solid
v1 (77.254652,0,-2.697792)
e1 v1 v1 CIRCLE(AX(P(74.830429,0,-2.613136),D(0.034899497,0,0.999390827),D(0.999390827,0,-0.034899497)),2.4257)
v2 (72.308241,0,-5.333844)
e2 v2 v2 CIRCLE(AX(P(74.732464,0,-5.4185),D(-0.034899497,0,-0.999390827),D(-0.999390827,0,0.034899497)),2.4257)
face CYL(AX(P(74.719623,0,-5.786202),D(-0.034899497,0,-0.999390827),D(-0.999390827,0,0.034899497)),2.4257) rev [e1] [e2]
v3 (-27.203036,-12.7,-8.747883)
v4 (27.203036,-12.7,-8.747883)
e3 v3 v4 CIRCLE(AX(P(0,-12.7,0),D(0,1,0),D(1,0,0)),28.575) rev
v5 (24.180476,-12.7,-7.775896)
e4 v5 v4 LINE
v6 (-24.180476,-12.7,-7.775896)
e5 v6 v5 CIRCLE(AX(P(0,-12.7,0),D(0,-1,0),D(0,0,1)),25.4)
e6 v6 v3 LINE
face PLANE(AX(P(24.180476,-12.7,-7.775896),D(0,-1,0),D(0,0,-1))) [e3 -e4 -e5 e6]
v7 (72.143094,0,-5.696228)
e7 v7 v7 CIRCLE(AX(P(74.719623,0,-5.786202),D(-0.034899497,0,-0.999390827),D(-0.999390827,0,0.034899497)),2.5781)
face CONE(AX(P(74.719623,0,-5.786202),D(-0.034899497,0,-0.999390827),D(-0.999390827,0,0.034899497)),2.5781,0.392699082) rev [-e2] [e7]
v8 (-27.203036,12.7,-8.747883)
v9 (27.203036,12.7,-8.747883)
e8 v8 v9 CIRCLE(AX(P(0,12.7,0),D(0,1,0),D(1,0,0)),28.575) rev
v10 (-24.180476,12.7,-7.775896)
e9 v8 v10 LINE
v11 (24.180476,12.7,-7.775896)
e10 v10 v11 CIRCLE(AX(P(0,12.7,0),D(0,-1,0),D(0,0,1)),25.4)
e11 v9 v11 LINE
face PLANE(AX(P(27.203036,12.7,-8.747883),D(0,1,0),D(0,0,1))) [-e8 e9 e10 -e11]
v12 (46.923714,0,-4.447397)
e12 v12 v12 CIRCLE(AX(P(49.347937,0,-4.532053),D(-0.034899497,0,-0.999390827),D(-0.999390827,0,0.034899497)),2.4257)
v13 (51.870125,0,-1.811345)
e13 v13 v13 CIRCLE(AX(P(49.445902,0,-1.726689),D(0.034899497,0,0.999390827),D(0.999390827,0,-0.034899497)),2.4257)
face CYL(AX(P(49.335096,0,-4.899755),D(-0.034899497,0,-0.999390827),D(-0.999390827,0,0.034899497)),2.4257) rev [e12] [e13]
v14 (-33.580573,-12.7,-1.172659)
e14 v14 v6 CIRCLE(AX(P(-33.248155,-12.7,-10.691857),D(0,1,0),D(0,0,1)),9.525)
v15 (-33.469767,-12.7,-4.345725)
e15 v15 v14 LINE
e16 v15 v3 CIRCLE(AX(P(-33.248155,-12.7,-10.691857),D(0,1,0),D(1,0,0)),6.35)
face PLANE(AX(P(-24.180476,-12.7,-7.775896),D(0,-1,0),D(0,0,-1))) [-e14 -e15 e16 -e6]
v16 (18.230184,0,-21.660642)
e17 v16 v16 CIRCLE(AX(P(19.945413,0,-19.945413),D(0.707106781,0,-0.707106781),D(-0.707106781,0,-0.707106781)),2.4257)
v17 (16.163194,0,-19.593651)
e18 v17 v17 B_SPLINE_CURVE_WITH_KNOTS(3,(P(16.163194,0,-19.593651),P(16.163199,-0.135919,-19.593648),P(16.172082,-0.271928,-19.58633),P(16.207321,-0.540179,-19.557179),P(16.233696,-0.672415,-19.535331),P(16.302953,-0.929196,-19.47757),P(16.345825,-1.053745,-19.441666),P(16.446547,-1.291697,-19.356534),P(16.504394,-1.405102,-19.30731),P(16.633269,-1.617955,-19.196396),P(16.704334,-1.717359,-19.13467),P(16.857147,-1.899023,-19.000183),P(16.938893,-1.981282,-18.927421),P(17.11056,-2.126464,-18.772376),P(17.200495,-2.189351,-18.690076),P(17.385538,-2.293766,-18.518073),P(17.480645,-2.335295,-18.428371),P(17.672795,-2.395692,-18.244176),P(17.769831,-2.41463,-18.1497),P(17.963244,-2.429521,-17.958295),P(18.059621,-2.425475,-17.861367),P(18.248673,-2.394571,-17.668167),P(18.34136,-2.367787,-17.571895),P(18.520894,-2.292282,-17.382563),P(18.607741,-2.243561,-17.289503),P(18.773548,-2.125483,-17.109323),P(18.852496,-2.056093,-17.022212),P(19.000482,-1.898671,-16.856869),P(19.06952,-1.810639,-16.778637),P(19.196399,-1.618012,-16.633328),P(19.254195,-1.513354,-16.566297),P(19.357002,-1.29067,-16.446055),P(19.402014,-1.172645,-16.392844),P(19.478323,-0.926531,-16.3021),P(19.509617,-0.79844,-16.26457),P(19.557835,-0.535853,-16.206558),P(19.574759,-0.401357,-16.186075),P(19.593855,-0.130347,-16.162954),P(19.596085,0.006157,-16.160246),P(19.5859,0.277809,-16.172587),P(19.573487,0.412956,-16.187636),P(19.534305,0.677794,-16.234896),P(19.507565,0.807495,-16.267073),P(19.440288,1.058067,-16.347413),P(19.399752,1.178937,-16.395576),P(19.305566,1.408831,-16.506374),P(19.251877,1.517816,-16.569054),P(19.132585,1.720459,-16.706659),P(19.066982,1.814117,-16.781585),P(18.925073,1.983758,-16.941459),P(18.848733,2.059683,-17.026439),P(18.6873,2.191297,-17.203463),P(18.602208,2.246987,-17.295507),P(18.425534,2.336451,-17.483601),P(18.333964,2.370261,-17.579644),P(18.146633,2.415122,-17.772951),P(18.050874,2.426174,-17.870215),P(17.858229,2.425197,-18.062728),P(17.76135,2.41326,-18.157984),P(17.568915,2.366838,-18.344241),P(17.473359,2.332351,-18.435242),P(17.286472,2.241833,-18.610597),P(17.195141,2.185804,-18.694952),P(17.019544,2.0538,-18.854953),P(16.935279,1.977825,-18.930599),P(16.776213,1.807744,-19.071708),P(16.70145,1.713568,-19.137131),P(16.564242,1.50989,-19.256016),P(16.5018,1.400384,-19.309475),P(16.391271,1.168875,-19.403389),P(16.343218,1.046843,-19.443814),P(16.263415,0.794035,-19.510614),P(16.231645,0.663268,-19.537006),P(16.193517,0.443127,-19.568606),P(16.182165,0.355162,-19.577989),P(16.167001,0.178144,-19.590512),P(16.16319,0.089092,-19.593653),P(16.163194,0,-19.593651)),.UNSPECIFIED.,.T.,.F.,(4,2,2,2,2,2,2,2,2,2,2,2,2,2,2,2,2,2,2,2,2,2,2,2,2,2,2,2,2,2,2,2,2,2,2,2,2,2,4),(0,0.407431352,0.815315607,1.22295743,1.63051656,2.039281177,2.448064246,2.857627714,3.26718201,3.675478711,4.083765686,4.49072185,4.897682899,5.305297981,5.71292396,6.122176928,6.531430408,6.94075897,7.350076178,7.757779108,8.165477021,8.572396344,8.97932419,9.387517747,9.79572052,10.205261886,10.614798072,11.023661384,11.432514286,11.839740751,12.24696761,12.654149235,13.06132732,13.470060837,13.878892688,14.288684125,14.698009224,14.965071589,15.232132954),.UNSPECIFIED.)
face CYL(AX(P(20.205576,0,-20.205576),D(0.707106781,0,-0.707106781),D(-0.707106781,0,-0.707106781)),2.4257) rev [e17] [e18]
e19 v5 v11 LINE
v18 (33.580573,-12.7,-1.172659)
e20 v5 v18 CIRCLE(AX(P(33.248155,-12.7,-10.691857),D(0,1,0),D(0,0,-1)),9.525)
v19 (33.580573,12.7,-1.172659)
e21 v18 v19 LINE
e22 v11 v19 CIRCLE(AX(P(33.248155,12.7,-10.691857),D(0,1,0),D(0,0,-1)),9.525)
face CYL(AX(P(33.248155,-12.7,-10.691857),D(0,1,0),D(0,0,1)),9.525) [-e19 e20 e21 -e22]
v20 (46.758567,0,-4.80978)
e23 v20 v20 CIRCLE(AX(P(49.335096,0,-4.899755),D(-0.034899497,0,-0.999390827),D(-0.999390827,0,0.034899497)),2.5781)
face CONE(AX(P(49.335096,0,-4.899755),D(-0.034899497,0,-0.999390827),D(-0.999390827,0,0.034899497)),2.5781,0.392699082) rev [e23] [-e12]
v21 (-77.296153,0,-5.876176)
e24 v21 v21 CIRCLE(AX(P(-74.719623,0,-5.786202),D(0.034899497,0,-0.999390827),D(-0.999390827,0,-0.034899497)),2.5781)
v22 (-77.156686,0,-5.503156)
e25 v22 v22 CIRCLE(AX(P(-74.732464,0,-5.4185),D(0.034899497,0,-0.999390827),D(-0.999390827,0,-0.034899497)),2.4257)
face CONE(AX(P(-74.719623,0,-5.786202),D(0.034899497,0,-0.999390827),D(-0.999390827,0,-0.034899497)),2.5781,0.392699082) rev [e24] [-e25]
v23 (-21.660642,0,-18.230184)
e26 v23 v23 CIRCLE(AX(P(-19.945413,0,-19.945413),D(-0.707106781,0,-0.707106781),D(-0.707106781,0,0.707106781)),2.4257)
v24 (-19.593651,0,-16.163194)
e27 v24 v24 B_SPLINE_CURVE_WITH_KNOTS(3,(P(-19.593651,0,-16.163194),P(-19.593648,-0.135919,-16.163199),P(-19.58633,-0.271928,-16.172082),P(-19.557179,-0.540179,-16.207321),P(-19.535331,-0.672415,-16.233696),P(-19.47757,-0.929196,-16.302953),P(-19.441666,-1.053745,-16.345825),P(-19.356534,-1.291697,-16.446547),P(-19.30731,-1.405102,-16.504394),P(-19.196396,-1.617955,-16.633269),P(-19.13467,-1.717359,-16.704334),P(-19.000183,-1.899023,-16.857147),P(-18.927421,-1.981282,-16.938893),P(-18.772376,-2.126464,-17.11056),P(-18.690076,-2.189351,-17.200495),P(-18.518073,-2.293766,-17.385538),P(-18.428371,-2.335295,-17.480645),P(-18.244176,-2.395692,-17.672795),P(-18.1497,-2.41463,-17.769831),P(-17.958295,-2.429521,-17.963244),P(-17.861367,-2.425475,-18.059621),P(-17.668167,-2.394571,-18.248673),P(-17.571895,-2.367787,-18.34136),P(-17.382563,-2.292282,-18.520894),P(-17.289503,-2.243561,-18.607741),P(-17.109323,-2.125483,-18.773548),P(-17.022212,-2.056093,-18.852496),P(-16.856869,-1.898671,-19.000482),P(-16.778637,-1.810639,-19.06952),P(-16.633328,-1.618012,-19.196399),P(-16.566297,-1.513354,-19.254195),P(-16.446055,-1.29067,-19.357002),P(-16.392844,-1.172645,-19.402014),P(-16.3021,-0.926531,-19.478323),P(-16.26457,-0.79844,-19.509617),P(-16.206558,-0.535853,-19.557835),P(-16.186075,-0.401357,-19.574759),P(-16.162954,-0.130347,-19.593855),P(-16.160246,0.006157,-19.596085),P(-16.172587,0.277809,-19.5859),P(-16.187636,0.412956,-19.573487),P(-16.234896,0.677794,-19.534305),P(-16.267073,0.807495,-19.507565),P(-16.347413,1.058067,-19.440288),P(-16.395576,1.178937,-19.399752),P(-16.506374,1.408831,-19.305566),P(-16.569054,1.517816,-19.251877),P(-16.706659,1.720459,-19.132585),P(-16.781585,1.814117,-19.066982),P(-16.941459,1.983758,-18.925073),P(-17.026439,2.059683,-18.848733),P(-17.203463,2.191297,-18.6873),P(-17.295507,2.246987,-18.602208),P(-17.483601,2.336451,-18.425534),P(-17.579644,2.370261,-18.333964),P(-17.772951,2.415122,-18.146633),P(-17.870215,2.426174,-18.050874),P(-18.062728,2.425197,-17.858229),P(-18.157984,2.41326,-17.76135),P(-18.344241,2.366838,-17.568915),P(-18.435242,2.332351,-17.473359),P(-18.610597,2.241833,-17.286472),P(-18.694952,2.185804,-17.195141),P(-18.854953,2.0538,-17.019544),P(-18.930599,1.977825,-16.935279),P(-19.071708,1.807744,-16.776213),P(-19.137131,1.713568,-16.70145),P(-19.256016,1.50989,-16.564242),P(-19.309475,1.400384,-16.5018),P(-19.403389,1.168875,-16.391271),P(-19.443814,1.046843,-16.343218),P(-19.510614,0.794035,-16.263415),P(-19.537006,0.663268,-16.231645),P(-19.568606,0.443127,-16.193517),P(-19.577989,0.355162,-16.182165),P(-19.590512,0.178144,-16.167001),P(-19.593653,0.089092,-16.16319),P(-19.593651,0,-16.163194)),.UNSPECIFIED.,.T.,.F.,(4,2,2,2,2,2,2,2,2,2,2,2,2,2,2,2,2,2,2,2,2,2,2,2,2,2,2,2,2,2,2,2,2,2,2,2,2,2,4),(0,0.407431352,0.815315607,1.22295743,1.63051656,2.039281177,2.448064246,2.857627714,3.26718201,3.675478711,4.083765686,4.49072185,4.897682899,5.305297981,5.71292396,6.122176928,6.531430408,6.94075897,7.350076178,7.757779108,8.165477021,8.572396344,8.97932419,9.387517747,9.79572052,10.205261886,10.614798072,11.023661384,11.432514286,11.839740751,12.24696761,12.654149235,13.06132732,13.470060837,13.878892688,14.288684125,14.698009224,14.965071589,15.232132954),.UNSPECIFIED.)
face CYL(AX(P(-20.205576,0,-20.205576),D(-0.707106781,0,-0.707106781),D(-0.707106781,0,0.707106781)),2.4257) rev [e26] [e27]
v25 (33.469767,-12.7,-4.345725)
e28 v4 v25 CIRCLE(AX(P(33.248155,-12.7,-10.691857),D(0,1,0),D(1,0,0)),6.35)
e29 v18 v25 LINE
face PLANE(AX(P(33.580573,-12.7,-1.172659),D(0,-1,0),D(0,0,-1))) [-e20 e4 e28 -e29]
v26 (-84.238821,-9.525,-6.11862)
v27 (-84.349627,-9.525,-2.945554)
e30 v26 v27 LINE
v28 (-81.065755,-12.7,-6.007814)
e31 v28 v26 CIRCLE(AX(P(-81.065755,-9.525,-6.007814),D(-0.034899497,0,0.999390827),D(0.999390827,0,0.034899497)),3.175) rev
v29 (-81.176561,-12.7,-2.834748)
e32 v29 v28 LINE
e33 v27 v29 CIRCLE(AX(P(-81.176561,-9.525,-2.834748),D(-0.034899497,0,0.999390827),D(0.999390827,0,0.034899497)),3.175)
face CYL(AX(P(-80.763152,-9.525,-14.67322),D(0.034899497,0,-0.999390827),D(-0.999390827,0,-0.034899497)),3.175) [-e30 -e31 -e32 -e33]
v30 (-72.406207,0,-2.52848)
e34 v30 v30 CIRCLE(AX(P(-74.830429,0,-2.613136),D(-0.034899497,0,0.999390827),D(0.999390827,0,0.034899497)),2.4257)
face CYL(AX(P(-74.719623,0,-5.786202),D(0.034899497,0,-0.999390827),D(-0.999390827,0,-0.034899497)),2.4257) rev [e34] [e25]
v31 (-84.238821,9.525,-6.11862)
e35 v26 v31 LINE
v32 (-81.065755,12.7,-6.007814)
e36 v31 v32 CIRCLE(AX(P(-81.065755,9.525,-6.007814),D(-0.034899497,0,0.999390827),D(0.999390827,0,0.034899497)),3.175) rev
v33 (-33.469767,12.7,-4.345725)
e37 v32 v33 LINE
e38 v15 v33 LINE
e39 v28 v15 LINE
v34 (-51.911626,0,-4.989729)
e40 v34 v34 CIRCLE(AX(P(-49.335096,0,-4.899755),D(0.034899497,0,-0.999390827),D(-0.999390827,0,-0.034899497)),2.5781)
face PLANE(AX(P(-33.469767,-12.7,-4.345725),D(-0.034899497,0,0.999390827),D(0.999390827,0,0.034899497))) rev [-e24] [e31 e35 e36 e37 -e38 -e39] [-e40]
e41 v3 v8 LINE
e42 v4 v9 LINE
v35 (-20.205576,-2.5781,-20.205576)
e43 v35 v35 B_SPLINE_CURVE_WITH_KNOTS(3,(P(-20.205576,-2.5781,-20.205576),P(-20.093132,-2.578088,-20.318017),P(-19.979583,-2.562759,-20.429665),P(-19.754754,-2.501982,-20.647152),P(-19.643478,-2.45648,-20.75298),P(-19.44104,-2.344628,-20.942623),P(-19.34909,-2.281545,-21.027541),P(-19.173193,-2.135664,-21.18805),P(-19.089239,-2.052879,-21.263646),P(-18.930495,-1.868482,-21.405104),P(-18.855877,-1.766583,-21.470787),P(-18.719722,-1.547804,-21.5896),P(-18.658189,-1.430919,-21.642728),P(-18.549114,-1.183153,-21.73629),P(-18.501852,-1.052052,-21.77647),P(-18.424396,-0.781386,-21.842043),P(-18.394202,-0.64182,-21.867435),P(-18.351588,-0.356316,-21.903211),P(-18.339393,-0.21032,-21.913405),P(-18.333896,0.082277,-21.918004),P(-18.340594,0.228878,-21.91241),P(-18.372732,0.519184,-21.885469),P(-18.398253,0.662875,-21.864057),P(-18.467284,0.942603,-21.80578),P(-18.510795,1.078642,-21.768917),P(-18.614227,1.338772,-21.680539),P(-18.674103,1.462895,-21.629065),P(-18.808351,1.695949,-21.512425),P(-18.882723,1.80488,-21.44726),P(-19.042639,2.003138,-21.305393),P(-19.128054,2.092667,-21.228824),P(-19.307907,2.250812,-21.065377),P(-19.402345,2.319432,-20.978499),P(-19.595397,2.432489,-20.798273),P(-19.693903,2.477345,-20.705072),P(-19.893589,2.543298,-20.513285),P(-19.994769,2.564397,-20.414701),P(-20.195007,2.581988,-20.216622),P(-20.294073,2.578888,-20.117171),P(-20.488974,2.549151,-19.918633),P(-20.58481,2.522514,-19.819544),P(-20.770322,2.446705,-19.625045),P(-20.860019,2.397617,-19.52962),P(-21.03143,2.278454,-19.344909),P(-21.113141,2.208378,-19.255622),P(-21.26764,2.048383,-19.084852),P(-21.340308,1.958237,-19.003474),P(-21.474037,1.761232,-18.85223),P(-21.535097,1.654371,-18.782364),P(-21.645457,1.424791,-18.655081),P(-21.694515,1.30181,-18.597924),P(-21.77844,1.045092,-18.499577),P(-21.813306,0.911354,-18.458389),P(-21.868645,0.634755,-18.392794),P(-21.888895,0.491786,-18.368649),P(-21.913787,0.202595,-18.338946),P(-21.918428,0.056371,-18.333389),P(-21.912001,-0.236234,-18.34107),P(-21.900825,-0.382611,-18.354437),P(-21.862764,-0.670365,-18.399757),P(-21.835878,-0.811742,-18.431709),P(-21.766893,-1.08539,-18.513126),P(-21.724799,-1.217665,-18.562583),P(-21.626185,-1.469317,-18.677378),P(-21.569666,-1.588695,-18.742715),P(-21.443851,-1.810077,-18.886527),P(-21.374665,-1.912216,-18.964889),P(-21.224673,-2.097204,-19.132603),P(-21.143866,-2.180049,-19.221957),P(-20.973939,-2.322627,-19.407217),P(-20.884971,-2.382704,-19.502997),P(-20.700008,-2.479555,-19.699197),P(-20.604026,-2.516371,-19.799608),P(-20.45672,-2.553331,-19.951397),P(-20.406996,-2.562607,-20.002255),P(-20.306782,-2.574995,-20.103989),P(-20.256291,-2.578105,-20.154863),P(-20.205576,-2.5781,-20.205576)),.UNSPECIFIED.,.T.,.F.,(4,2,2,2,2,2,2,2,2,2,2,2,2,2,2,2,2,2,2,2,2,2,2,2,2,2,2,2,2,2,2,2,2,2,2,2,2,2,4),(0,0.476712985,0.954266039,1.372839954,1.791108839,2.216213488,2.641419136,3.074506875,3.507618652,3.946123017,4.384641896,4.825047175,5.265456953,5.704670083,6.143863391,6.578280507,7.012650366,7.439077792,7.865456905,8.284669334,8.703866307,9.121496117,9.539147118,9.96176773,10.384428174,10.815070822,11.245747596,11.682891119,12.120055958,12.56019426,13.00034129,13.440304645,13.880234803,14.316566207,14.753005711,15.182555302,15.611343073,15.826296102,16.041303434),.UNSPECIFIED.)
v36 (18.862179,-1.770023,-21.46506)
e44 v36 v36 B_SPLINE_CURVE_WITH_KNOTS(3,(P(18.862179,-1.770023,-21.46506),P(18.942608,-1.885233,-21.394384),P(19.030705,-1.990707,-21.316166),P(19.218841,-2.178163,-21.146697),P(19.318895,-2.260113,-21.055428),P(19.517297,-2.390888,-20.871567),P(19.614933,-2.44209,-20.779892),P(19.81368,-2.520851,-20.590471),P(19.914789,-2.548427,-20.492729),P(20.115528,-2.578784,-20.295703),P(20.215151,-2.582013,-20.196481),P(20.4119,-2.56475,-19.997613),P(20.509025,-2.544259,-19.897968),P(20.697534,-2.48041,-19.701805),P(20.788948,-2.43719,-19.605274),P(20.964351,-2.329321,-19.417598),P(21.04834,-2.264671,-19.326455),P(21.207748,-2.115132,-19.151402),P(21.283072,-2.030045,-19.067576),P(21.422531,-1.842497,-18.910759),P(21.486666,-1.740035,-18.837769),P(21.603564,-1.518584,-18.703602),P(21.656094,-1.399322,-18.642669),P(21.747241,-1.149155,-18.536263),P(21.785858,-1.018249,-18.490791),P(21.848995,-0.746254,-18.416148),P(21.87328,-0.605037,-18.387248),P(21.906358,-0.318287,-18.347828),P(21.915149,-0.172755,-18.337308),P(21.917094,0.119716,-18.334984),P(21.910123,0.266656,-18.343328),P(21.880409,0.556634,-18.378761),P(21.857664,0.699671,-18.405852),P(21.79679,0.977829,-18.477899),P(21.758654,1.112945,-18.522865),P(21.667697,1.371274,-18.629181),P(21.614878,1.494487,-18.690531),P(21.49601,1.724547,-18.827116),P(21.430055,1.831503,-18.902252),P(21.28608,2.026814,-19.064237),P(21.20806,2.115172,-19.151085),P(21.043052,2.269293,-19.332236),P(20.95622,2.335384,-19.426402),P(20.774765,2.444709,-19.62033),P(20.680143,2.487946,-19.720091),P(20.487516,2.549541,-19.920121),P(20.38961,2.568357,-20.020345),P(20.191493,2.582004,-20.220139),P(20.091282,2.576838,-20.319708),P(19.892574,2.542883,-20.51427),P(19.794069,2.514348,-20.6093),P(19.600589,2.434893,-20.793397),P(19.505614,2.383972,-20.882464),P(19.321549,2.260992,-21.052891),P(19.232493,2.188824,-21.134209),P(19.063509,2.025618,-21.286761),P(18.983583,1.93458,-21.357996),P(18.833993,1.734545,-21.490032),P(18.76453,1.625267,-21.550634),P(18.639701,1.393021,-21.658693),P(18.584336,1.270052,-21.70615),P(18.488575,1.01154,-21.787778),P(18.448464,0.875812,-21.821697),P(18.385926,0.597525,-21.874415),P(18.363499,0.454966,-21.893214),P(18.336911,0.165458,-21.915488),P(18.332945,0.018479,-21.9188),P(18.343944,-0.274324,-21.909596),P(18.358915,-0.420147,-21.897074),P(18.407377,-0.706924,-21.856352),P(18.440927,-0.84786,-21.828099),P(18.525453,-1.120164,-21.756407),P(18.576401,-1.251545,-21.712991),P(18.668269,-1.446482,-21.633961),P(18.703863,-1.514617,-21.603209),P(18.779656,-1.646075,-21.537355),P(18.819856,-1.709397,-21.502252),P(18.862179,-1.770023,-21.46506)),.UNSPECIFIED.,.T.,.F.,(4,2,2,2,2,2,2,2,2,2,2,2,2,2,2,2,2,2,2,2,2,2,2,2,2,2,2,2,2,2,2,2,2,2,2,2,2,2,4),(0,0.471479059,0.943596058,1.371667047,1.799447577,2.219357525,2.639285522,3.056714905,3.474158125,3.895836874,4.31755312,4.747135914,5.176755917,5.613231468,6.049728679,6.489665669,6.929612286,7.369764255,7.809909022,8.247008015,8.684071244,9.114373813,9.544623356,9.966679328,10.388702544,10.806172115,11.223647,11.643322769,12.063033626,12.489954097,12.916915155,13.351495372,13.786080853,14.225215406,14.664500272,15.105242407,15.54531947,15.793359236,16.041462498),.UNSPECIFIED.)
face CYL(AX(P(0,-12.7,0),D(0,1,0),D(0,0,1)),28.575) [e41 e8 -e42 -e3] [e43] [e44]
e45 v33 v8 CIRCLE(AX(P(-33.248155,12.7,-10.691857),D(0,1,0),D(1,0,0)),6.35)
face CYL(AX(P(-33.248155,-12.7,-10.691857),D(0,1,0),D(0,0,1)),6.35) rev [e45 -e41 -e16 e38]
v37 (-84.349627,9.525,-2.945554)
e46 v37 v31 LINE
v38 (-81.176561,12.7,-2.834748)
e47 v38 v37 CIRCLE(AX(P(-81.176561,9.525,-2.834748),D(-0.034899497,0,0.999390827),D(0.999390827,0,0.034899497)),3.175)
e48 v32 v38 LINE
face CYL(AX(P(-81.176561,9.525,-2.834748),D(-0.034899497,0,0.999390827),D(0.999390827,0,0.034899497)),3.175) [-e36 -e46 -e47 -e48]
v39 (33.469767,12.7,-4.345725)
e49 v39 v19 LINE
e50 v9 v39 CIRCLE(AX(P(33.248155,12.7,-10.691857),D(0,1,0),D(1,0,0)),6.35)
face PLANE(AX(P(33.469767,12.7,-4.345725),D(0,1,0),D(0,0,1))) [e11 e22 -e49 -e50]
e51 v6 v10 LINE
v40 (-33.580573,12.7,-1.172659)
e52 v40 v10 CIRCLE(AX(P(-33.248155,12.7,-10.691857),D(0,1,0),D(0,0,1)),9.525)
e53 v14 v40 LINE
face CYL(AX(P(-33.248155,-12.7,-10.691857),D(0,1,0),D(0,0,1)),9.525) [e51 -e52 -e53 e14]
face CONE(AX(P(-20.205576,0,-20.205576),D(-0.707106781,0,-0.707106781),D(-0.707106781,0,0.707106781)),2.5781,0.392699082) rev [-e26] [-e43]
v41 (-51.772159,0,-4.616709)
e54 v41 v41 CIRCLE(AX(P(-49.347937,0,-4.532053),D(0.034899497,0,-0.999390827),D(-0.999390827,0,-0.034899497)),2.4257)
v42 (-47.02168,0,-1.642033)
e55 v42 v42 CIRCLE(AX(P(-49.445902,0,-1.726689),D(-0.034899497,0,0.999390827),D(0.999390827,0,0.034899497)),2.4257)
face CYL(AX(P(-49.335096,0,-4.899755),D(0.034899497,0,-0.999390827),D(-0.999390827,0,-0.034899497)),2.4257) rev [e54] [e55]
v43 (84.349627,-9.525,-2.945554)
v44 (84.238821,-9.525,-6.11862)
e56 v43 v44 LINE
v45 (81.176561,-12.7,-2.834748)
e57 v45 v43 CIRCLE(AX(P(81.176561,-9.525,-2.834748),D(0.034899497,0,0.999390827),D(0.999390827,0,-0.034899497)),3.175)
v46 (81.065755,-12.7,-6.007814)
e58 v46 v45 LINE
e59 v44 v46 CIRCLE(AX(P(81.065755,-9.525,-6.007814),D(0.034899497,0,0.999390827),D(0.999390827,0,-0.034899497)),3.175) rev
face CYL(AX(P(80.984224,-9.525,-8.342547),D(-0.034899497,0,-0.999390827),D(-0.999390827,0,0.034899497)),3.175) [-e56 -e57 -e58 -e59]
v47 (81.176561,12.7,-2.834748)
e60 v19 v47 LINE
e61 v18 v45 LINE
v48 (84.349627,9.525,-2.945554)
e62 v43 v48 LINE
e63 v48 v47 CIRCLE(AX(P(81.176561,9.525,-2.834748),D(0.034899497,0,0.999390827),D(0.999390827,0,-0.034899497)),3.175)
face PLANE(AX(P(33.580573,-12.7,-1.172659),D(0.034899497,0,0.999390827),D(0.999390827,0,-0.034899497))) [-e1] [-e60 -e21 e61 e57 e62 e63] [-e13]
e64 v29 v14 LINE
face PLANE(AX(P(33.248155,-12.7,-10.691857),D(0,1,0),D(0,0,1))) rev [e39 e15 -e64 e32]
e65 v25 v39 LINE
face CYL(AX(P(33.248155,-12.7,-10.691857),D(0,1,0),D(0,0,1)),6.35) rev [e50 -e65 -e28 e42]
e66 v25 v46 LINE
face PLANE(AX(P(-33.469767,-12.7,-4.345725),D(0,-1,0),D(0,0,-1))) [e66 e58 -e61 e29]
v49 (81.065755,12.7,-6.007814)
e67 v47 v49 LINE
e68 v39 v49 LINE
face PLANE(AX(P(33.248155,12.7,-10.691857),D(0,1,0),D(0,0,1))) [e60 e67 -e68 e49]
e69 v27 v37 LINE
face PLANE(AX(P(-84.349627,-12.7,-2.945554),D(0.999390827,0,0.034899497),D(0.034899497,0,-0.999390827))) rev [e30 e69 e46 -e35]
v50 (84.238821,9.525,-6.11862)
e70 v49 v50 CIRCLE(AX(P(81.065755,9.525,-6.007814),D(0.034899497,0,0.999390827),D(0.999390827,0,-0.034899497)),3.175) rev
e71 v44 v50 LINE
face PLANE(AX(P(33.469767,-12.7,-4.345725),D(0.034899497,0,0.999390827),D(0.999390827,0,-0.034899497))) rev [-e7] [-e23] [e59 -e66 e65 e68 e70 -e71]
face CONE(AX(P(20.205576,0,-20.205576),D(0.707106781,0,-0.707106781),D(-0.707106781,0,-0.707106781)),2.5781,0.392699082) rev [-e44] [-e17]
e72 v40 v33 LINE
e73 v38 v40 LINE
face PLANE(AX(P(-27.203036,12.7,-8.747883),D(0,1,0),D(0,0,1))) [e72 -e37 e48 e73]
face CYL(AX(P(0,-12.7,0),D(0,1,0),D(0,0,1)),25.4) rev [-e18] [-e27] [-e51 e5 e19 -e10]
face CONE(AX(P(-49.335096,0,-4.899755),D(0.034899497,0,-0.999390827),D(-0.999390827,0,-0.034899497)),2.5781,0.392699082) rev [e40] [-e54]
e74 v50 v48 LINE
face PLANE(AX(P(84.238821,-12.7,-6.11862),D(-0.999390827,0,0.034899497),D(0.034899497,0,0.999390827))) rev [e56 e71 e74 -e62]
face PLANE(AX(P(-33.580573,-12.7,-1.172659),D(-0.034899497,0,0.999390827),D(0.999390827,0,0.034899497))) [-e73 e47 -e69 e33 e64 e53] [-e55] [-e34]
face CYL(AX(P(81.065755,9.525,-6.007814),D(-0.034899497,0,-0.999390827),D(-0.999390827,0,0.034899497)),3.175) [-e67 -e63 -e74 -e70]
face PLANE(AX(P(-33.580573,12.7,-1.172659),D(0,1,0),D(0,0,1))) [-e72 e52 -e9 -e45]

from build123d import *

# Parameters (mm, degrees)
BASE_FLANGE1_DEPTH                    = 12.7
F_11_0_191_DIAMETER_HOLE2_AT_2_COUNT  = 2
F_11_0_191_DIAMETER_HOLE2_AT_2_PITCH  = 25.4
F_11_0_191_DIAMETER_HOLE3_D           = 4.8514
F_11_0_191_DIAMETER_HOLE3_DEPTH       = 40.176204246
F_11_0_191_DIAMETER_HOLE3_CSINK_D     = 5.1562
F_11_0_191_DIAMETER_HOLE3_CSINK_ANGLE = 45
FILLET2_R                             = 3.175


# Sheet-metal steps are written as plain solids
with BuildPart() as part:
    # Sketch1 → Base-Flange1 (new, symmetric)
    with BuildSketch(Plane(origin=(0, 0, 0), x_dir=(1, 0, 0), z_dir=(0, 1, 0))):
        with BuildLine():
            Line((84.349626816, 2.945553875), (33.580572804, 1.172659442))
            ThreePointArc((33.580572804, 1.172659442), (27.77304054, 2.897708907), (24.180476435, 7.775896051))
            ThreePointArc((24.180476435, 7.775896051), (0, 25.4), (-24.180476435, 7.775896051))
            ThreePointArc((-24.180476435, 7.775896051), (-27.77304054, 2.897708907), (-33.580572804, 1.172659442))
            Line((-33.580572804, 1.172659442), (-84.349626816, 2.945553875))
            Line((-84.349626816, 2.945553875), (-84.238820914, 6.118619751))
            Line((-84.238820914, 6.118619751), (-33.469766902, 4.345725318))
            ThreePointArc((-33.469766902, 4.345725318), (-29.598078726, 5.495758295), (-27.203035989, 8.747883057))
            ThreePointArc((-27.203035989, 8.747883057), (0, 28.575), (27.203035989, 8.747883057))
            ThreePointArc((27.203035989, 8.747883057), (29.598078726, 5.495758295), (33.469766902, 4.345725318))
            Line((33.469766902, 4.345725318), (84.238820914, 6.118619751))
            Line((84.238820914, 6.118619751), (84.349626816, 2.945553875))
        make_face()
    extrude(amount=BASE_FLANGE1_DEPTH, both=True)

    # Sketch8 → #11 (0.191) Diameter Hole2 (revolve, cut)
    with BuildSketch(Plane(origin=(74.719623287, 0, -5.786202044), x_dir=(-0.9993908270190958, 0, 0.03489949670250169), z_dir=(0, 1, 0))):
        Polygon((0, 0), (0, 4.947848723), (2.4257, 4.947848723), (2.4257, 0.367926147), (2.5781, 0), align=None)
    f_11_0_191_diameter_hole2 = revolve(axis=Axis((74.498011483, 0, -12.132333796), (0.03489949670250171, 0, 0.9993908270190958)), mode=Mode.SUBTRACT)

    # #11 (0.191) Diameter Hole2 at 2: #11 (0.191) Diameter Hole2 ×2
    with Locations(*[Vector(-0.9993908270190958, 0, 0.034899496702501684) * (i * F_11_0_191_DIAMETER_HOLE2_AT_2_PITCH) for i in range(1, F_11_0_191_DIAMETER_HOLE2_AT_2_COUNT)]):
        add(f_11_0_191_diameter_hole2, mode=Mode.SUBTRACT)

    # #11 (0.191) Diameter Hole3
    with Locations(Plane(origin=(20.205576272, 0, -20.205576272), x_dir=(0.707106781187, 0, 0.707106781187), z_dir=(0.707106781187, 0, -0.707106781187))):
        with Locations((0, 0)):
            f_11_0_191_diameter_hole3 = CounterSinkHole(F_11_0_191_DIAMETER_HOLE3_D / 2, F_11_0_191_DIAMETER_HOLE3_CSINK_D / 2, depth=F_11_0_191_DIAMETER_HOLE3_DEPTH, counter_sink_angle=F_11_0_191_DIAMETER_HOLE3_CSINK_ANGLE)

    # Fillet2
    fillet2_edges = [part.edges().sort_by_distance(p)[0] for p in [
        (84.294223865, 12.7, -4.532086813),
        (-84.294223865, -12.7, -4.532086813),
        (84.294223865, -12.7, -4.532086813),
        (-84.294223865, 12.7, -4.532086813),
    ]]
    fillet(fillet2_edges, radius=FILLET2_R)

    # Mirror1: #11 (0.191) Diameter Hole2, #11 (0.191) Diameter Hole3 across plane
    add(f_11_0_191_diameter_hole2.mirror(Plane(origin=(0, 0, 0), x_dir=(0, 0, 1), z_dir=(1, 0, 0))), mode=Mode.SUBTRACT)
    add(f_11_0_191_diameter_hole3.mirror(Plane(origin=(0, 0, 0), x_dir=(0, 0, 1), z_dir=(1, 0, 0))), mode=Mode.SUBTRACT)

    # Mirror1 copy 1 sketch → Mirror1 copy 1 (revolve, cut)
    with BuildSketch(Plane(origin=(-49.335096281, 0, -4.899754828), x_dir=(0.9993908270190958, 0, 0.03489949670250169), z_dir=(0, 1, 0))):
        Polygon((0, 0), (0, -4.947848723), (2.4257, -4.947848723), (2.4257, -0.367926147), (2.5781, 0), align=None)
    revolve(axis=Axis((-49.113484477, 0, -11.24588658), (0.03489949670250171, 0, -0.9993908270190958)), mode=Mode.SUBTRACT)


solid = part.part
